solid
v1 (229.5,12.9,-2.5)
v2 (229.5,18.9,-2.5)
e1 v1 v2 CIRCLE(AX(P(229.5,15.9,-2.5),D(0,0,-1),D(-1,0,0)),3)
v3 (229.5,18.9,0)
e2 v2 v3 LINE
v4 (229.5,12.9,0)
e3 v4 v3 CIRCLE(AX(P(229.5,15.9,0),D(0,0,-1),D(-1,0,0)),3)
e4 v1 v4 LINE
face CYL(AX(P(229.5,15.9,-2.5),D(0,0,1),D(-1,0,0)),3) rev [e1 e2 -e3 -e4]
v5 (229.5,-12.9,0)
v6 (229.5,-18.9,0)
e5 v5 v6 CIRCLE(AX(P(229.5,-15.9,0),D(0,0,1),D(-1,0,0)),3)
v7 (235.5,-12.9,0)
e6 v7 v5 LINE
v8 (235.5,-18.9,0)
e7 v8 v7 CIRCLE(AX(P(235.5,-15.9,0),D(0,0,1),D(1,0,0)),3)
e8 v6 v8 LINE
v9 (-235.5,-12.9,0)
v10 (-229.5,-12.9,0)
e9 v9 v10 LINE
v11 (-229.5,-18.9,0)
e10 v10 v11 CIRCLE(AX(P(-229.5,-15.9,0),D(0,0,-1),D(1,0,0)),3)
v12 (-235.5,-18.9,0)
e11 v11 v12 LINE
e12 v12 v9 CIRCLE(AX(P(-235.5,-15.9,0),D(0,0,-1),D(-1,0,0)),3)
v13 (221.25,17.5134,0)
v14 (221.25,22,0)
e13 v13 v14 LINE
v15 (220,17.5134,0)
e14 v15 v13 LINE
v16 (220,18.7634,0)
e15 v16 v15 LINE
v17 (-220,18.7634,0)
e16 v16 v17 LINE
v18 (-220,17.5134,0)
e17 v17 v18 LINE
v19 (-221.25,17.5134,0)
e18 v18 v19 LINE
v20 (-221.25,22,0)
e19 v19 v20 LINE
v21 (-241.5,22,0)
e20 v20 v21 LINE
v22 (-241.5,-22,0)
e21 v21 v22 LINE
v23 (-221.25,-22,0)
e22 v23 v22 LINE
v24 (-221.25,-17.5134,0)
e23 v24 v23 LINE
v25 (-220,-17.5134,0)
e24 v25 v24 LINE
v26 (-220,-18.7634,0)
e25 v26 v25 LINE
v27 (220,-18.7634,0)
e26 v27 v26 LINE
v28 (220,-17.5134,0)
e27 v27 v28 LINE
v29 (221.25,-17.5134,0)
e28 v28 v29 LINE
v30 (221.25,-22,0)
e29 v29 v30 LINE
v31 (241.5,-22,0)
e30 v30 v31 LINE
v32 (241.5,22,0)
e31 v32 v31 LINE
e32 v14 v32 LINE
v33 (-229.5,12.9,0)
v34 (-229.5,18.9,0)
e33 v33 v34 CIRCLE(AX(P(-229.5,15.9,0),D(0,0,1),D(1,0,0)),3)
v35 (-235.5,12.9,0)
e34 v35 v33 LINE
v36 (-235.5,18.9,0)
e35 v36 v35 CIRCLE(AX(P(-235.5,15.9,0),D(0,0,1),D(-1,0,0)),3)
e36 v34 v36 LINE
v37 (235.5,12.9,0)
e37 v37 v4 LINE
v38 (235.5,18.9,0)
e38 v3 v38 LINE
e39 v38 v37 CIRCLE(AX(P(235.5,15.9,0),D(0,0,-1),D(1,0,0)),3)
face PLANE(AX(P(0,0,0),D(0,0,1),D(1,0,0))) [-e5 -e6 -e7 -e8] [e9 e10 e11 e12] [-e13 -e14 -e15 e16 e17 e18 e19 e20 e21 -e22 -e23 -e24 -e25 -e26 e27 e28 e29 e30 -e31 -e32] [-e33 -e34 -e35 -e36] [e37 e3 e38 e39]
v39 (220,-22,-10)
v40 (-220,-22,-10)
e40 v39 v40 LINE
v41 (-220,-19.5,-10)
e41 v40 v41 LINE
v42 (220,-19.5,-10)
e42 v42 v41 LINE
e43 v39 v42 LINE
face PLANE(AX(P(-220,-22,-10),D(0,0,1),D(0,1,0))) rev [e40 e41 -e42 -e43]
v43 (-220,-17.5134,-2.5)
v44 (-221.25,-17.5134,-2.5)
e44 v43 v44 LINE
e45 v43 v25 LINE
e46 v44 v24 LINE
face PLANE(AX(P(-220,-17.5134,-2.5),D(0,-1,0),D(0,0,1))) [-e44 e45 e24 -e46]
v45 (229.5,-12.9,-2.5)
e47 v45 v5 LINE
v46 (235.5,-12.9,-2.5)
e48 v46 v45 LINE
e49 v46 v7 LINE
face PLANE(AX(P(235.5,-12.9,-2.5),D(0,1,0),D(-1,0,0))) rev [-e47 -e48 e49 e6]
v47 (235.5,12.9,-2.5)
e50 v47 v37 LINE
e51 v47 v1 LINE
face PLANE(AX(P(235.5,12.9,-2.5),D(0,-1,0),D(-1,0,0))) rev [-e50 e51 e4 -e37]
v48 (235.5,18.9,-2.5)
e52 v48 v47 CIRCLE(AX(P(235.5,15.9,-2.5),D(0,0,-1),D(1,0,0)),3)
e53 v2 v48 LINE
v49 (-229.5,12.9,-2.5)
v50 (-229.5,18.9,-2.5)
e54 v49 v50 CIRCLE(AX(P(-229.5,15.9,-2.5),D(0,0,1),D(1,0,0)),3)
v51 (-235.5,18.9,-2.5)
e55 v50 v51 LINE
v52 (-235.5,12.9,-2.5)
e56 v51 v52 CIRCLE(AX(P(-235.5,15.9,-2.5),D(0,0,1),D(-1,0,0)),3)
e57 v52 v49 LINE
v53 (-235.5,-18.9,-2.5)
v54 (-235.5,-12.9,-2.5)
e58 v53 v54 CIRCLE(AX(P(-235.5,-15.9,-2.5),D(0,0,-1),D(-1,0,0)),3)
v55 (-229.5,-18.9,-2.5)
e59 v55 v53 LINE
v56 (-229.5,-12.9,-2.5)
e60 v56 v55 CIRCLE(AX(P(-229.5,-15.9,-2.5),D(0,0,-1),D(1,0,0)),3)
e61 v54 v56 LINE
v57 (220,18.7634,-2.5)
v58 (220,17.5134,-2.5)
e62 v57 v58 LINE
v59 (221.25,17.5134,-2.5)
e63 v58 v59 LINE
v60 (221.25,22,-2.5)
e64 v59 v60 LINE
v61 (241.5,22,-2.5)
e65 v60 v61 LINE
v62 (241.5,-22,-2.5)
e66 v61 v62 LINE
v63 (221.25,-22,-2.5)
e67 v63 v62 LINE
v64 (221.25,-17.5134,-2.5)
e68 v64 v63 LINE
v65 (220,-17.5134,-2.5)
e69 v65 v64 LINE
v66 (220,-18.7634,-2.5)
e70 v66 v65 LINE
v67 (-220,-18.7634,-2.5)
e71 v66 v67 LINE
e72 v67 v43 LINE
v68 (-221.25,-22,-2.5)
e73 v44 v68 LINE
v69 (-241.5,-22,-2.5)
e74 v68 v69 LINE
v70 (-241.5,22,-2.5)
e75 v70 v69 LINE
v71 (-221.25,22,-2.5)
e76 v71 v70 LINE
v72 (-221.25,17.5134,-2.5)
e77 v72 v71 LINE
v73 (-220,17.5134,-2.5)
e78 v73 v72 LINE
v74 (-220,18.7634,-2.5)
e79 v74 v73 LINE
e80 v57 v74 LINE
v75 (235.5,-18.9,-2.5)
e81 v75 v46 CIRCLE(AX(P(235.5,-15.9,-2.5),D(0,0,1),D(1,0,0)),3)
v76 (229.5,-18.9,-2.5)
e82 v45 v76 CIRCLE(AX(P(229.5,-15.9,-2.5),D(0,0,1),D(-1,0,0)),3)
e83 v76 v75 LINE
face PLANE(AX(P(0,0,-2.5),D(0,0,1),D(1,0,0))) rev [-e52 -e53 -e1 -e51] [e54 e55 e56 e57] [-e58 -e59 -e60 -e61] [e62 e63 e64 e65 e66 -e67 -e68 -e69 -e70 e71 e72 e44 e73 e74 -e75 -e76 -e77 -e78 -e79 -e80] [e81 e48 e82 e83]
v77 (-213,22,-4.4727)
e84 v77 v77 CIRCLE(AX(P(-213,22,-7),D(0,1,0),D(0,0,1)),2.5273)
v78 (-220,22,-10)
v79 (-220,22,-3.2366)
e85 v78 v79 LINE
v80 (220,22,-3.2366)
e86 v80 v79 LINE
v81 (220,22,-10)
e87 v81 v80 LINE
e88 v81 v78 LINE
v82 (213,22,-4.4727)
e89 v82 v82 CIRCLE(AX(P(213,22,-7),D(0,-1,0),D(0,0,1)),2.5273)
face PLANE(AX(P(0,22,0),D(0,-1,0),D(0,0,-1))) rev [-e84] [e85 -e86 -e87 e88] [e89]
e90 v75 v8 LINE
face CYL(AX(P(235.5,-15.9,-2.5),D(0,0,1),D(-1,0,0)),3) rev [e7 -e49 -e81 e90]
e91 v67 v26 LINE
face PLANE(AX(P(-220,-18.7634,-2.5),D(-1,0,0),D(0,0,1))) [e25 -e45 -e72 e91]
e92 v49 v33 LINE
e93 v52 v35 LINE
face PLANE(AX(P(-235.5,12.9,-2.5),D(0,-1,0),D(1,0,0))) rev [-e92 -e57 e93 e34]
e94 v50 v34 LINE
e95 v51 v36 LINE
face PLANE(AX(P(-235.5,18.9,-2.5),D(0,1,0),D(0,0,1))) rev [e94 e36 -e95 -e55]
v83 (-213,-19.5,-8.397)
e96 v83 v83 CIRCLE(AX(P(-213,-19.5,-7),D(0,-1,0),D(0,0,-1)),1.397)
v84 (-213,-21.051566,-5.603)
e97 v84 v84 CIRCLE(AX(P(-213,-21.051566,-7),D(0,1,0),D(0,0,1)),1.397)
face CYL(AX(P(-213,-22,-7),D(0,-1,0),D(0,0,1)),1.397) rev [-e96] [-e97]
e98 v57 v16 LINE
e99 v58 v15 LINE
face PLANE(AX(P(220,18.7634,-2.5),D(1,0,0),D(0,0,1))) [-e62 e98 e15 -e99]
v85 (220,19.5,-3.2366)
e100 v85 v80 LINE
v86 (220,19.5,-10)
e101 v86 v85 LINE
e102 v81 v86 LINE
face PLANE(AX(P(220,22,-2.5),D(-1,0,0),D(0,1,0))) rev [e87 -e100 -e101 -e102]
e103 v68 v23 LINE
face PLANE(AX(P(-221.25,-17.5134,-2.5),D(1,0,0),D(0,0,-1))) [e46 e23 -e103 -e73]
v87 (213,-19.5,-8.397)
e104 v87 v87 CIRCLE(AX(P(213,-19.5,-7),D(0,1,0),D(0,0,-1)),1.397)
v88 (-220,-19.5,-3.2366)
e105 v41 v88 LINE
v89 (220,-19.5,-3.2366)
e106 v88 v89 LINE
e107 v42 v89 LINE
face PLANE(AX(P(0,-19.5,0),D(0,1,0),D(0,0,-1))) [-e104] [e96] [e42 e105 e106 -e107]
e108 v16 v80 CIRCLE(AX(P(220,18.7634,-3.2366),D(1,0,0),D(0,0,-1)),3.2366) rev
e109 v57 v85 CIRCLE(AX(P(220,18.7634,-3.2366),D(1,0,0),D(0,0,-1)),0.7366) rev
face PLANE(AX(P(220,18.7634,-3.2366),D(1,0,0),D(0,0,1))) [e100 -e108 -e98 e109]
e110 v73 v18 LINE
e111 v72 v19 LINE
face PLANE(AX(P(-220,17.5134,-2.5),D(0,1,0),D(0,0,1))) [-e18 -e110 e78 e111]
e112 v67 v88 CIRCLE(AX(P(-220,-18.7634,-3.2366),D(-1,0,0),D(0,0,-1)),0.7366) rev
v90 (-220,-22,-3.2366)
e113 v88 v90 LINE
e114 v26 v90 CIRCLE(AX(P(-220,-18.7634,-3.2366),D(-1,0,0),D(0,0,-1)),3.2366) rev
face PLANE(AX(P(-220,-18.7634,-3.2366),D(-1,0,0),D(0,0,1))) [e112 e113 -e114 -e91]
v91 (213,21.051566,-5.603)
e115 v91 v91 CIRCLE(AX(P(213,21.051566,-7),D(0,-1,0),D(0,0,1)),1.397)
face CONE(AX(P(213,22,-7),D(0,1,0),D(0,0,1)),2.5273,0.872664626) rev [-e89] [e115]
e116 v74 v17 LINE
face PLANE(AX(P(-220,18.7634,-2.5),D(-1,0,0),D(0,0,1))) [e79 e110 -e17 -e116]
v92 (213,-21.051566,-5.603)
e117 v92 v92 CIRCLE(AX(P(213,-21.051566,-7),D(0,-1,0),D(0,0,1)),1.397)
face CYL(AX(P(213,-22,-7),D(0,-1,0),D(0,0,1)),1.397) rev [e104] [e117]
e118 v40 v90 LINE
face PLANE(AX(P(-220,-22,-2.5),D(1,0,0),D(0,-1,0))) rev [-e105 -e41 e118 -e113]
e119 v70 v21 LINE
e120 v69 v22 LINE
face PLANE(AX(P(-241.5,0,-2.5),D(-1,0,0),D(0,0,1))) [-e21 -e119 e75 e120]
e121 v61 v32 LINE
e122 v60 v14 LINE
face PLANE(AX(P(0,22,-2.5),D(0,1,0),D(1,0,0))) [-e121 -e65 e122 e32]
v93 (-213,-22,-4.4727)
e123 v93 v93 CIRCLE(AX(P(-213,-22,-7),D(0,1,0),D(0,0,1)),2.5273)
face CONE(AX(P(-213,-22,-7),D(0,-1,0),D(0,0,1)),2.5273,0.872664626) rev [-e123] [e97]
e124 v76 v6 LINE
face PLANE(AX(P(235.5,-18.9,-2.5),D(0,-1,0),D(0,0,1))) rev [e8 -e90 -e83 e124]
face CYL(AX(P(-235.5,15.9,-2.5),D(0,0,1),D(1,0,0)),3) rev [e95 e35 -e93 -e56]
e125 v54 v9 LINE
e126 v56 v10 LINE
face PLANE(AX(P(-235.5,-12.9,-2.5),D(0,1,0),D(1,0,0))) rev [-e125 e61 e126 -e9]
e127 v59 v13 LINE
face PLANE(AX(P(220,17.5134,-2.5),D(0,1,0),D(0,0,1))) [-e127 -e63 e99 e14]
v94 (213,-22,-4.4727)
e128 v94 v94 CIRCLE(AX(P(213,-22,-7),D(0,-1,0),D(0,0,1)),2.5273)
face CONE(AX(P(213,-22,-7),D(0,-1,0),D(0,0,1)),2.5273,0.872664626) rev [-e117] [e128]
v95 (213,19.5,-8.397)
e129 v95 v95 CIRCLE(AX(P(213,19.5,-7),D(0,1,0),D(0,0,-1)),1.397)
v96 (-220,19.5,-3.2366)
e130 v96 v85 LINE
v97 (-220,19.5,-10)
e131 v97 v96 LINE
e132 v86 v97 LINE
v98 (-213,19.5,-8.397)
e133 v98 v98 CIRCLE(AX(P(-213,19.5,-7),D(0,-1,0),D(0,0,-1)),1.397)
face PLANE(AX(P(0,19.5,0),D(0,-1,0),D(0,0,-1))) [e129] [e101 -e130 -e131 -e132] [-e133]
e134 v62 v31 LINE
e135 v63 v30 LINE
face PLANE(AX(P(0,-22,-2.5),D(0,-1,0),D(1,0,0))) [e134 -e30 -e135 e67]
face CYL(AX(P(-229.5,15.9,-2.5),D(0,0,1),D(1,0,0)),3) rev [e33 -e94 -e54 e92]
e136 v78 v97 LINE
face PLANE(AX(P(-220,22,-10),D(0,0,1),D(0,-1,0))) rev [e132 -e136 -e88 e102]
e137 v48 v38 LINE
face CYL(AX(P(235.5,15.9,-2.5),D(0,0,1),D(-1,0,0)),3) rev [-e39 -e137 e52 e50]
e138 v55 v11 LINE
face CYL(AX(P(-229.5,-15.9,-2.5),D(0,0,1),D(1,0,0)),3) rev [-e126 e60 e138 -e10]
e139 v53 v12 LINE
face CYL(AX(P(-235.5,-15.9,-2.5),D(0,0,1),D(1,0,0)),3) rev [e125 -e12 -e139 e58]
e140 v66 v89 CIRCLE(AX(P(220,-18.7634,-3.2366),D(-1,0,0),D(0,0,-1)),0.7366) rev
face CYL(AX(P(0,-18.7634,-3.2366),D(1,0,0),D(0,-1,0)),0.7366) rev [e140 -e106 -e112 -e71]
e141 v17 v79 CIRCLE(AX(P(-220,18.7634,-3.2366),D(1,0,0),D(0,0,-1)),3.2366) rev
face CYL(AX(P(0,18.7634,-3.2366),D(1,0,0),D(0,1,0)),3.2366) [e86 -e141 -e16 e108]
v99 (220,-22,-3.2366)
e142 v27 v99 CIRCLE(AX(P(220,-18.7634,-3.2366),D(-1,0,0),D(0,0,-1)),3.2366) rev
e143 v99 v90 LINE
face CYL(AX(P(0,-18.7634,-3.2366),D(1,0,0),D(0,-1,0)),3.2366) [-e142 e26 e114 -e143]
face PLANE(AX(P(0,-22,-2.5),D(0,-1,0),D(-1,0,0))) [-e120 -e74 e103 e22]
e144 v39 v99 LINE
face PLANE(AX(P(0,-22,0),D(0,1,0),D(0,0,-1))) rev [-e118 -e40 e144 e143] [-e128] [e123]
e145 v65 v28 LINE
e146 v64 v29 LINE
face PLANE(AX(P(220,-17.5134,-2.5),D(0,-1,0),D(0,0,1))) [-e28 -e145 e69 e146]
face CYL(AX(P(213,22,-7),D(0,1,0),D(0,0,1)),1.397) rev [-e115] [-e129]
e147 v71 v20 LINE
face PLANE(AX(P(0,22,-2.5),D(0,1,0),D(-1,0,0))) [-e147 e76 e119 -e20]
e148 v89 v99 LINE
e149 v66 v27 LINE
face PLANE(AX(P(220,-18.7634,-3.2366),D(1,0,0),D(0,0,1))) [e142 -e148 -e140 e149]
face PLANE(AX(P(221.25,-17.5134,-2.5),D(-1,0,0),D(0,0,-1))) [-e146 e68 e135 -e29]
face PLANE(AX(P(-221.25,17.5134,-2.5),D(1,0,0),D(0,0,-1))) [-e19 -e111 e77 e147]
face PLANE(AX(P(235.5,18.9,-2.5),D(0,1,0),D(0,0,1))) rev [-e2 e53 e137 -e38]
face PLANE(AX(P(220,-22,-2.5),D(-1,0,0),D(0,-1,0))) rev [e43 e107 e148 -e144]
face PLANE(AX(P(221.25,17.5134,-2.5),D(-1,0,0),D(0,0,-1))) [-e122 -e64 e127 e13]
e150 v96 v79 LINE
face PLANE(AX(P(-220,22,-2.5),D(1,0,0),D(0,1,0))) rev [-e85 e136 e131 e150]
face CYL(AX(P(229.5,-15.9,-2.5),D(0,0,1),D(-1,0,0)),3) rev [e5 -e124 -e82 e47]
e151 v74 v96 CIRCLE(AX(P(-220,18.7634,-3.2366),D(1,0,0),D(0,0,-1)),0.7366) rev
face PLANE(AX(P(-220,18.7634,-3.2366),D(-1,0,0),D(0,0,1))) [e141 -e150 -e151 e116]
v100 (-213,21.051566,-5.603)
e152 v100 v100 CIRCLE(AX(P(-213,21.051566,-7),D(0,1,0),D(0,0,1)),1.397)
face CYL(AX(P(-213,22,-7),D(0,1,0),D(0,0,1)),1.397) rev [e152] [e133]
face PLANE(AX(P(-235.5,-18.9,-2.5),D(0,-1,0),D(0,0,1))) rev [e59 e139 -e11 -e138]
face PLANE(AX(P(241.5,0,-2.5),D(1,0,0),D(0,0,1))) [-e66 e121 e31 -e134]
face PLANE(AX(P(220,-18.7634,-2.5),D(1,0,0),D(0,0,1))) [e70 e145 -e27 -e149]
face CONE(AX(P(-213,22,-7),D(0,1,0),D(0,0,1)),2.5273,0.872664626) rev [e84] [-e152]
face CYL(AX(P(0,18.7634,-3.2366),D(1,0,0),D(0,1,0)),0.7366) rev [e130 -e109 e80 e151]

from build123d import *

# Parameters (mm, degrees)
SKETCH1_W                                         = 241.5
SKETCH1_H                                         = 22
BASE_FLANGE1_DEPTH                                = 2.5
EDGE_FLANGE1_STRIP_W                              = 11.4732
EDGE_FLANGE1_STRIP_H                              = 2.5
EDGE_FLANGE1_STRIP_CUT_DEPTH                      = 220
EDGE_FLANGE1_RELIEF_W                             = 12.7232
EDGE_FLANGE1_RELIEF_H                             = 1.25
EDGE_FLANGE1_RELIEF_CUT_DEPTH                     = 2.5
EDGE_FLANGE1_DEPTH                                = 220
CUT_EXTRUDE1_DEPTH                                = 2.5
CSK_FOR_3_FLAT_HEAD_MACHINE_SCREW_100_D           = 2.794
CSK_FOR_3_FLAT_HEAD_MACHINE_SCREW_100_CSINK_D     = 5.0546
CSK_FOR_3_FLAT_HEAD_MACHINE_SCREW_100_CSINK_ANGLE = 100


# Sheet-metal steps are written as plain solids
with BuildPart() as part:
    # Sketch1 → Base-Flange1 (new body)
    with BuildSketch(Plane.XY):
        with Locations((-120.75, 11)):
            Rectangle(SKETCH1_W, SKETCH1_H)
    extrude(amount=-BASE_FLANGE1_DEPTH)

    # Edge-Flange1 strip (across the edge) → Edge-Flange1 strip cut (cut)
    with BuildSketch(Plane(origin=(-220, 22, -2.5), x_dir=(0, -1, 0), z_dir=(1, 0, 0))):
        with Locations((-2.5, -1.25)):
            Rectangle(EDGE_FLANGE1_STRIP_W, EDGE_FLANGE1_STRIP_H)
    extrude(amount=EDGE_FLANGE1_STRIP_CUT_DEPTH, mode=Mode.SUBTRACT)

    # Edge-Flange1 relief (on the sheet) → Edge-Flange1 relief cut (cut)
    with BuildSketch(Plane(origin=(-220, 18.7634, -2.5), x_dir=(0, -1, 0), z_dir=(0, 0, -1))):
        with Locations((-5.1116, 0.625)):
            Rectangle(EDGE_FLANGE1_RELIEF_W, EDGE_FLANGE1_RELIEF_H)
    extrude(amount=-EDGE_FLANGE1_RELIEF_CUT_DEPTH, mode=Mode.SUBTRACT)

    # Edge-Flange1 section (across the edge) → Edge-Flange1 (add)
    with BuildSketch(Plane(origin=(-220, 22, -2.5), x_dir=(0, -1, 0), z_dir=(1, 0, 0))):
        with BuildLine():
            Line((0, 0.7366), (0, 7.5))
            Line((0, 7.5), (2.5, 7.5))
            Line((2.5, 7.5), (2.5, 0.7366))
            ThreePointArc((2.5, 0.7366), (2.715745145, 0.215745145), (3.2366, 0))
            Line((3.2366, 0), (3.2366, -2.5))
            ThreePointArc((3.2366, -2.5), (0.947978192, -1.552021808), (0, 0.7366))
        make_face()
    extrude(amount=EDGE_FLANGE1_DEPTH)

    # Sketch13 → Cut-Extrude1 (cut)
    with BuildSketch(Plane.XY):
        with BuildLine():
            Line((-235.5, 18.9), (-229.5, 18.9))
            ThreePointArc((-229.5, 18.9), (-226.5, 15.9), (-229.5, 12.9))
            Line((-229.5, 12.9), (-235.5, 12.9))
            ThreePointArc((-235.5, 12.9), (-238.5, 15.9), (-235.5, 18.9))
        make_face()
    extrude(amount=-CUT_EXTRUDE1_DEPTH, mode=Mode.SUBTRACT)

    # CSK for #3 Flat Head Machine Screw (100)1 (through all)
    with Locations(Plane(origin=(0, 22, 0), x_dir=(1, 0, 0), z_dir=(0, 1, 0))):
        with Locations((-213, 7)):
            CounterSinkHole(CSK_FOR_3_FLAT_HEAD_MACHINE_SCREW_100_D / 2, CSK_FOR_3_FLAT_HEAD_MACHINE_SCREW_100_CSINK_D / 2, counter_sink_angle=CSK_FOR_3_FLAT_HEAD_MACHINE_SCREW_100_CSINK_ANGLE)

    # Mirror1: part across plane


with BuildPart() as part_1:
    add(part.part)
    add(part.part.mirror(Plane(origin=(0, 0, -2.5), x_dir=(0, 0, 1), z_dir=(1, 0, 0))))

    # Mirror2: part across face


with BuildPart() as part_2:
    add(part_1.part)
    add(part_1.part.mirror(Plane(origin=(0, 0, -1.25), x_dir=(0, 0, 1), z_dir=(0, -1, 0))))


solid = part_2.part
